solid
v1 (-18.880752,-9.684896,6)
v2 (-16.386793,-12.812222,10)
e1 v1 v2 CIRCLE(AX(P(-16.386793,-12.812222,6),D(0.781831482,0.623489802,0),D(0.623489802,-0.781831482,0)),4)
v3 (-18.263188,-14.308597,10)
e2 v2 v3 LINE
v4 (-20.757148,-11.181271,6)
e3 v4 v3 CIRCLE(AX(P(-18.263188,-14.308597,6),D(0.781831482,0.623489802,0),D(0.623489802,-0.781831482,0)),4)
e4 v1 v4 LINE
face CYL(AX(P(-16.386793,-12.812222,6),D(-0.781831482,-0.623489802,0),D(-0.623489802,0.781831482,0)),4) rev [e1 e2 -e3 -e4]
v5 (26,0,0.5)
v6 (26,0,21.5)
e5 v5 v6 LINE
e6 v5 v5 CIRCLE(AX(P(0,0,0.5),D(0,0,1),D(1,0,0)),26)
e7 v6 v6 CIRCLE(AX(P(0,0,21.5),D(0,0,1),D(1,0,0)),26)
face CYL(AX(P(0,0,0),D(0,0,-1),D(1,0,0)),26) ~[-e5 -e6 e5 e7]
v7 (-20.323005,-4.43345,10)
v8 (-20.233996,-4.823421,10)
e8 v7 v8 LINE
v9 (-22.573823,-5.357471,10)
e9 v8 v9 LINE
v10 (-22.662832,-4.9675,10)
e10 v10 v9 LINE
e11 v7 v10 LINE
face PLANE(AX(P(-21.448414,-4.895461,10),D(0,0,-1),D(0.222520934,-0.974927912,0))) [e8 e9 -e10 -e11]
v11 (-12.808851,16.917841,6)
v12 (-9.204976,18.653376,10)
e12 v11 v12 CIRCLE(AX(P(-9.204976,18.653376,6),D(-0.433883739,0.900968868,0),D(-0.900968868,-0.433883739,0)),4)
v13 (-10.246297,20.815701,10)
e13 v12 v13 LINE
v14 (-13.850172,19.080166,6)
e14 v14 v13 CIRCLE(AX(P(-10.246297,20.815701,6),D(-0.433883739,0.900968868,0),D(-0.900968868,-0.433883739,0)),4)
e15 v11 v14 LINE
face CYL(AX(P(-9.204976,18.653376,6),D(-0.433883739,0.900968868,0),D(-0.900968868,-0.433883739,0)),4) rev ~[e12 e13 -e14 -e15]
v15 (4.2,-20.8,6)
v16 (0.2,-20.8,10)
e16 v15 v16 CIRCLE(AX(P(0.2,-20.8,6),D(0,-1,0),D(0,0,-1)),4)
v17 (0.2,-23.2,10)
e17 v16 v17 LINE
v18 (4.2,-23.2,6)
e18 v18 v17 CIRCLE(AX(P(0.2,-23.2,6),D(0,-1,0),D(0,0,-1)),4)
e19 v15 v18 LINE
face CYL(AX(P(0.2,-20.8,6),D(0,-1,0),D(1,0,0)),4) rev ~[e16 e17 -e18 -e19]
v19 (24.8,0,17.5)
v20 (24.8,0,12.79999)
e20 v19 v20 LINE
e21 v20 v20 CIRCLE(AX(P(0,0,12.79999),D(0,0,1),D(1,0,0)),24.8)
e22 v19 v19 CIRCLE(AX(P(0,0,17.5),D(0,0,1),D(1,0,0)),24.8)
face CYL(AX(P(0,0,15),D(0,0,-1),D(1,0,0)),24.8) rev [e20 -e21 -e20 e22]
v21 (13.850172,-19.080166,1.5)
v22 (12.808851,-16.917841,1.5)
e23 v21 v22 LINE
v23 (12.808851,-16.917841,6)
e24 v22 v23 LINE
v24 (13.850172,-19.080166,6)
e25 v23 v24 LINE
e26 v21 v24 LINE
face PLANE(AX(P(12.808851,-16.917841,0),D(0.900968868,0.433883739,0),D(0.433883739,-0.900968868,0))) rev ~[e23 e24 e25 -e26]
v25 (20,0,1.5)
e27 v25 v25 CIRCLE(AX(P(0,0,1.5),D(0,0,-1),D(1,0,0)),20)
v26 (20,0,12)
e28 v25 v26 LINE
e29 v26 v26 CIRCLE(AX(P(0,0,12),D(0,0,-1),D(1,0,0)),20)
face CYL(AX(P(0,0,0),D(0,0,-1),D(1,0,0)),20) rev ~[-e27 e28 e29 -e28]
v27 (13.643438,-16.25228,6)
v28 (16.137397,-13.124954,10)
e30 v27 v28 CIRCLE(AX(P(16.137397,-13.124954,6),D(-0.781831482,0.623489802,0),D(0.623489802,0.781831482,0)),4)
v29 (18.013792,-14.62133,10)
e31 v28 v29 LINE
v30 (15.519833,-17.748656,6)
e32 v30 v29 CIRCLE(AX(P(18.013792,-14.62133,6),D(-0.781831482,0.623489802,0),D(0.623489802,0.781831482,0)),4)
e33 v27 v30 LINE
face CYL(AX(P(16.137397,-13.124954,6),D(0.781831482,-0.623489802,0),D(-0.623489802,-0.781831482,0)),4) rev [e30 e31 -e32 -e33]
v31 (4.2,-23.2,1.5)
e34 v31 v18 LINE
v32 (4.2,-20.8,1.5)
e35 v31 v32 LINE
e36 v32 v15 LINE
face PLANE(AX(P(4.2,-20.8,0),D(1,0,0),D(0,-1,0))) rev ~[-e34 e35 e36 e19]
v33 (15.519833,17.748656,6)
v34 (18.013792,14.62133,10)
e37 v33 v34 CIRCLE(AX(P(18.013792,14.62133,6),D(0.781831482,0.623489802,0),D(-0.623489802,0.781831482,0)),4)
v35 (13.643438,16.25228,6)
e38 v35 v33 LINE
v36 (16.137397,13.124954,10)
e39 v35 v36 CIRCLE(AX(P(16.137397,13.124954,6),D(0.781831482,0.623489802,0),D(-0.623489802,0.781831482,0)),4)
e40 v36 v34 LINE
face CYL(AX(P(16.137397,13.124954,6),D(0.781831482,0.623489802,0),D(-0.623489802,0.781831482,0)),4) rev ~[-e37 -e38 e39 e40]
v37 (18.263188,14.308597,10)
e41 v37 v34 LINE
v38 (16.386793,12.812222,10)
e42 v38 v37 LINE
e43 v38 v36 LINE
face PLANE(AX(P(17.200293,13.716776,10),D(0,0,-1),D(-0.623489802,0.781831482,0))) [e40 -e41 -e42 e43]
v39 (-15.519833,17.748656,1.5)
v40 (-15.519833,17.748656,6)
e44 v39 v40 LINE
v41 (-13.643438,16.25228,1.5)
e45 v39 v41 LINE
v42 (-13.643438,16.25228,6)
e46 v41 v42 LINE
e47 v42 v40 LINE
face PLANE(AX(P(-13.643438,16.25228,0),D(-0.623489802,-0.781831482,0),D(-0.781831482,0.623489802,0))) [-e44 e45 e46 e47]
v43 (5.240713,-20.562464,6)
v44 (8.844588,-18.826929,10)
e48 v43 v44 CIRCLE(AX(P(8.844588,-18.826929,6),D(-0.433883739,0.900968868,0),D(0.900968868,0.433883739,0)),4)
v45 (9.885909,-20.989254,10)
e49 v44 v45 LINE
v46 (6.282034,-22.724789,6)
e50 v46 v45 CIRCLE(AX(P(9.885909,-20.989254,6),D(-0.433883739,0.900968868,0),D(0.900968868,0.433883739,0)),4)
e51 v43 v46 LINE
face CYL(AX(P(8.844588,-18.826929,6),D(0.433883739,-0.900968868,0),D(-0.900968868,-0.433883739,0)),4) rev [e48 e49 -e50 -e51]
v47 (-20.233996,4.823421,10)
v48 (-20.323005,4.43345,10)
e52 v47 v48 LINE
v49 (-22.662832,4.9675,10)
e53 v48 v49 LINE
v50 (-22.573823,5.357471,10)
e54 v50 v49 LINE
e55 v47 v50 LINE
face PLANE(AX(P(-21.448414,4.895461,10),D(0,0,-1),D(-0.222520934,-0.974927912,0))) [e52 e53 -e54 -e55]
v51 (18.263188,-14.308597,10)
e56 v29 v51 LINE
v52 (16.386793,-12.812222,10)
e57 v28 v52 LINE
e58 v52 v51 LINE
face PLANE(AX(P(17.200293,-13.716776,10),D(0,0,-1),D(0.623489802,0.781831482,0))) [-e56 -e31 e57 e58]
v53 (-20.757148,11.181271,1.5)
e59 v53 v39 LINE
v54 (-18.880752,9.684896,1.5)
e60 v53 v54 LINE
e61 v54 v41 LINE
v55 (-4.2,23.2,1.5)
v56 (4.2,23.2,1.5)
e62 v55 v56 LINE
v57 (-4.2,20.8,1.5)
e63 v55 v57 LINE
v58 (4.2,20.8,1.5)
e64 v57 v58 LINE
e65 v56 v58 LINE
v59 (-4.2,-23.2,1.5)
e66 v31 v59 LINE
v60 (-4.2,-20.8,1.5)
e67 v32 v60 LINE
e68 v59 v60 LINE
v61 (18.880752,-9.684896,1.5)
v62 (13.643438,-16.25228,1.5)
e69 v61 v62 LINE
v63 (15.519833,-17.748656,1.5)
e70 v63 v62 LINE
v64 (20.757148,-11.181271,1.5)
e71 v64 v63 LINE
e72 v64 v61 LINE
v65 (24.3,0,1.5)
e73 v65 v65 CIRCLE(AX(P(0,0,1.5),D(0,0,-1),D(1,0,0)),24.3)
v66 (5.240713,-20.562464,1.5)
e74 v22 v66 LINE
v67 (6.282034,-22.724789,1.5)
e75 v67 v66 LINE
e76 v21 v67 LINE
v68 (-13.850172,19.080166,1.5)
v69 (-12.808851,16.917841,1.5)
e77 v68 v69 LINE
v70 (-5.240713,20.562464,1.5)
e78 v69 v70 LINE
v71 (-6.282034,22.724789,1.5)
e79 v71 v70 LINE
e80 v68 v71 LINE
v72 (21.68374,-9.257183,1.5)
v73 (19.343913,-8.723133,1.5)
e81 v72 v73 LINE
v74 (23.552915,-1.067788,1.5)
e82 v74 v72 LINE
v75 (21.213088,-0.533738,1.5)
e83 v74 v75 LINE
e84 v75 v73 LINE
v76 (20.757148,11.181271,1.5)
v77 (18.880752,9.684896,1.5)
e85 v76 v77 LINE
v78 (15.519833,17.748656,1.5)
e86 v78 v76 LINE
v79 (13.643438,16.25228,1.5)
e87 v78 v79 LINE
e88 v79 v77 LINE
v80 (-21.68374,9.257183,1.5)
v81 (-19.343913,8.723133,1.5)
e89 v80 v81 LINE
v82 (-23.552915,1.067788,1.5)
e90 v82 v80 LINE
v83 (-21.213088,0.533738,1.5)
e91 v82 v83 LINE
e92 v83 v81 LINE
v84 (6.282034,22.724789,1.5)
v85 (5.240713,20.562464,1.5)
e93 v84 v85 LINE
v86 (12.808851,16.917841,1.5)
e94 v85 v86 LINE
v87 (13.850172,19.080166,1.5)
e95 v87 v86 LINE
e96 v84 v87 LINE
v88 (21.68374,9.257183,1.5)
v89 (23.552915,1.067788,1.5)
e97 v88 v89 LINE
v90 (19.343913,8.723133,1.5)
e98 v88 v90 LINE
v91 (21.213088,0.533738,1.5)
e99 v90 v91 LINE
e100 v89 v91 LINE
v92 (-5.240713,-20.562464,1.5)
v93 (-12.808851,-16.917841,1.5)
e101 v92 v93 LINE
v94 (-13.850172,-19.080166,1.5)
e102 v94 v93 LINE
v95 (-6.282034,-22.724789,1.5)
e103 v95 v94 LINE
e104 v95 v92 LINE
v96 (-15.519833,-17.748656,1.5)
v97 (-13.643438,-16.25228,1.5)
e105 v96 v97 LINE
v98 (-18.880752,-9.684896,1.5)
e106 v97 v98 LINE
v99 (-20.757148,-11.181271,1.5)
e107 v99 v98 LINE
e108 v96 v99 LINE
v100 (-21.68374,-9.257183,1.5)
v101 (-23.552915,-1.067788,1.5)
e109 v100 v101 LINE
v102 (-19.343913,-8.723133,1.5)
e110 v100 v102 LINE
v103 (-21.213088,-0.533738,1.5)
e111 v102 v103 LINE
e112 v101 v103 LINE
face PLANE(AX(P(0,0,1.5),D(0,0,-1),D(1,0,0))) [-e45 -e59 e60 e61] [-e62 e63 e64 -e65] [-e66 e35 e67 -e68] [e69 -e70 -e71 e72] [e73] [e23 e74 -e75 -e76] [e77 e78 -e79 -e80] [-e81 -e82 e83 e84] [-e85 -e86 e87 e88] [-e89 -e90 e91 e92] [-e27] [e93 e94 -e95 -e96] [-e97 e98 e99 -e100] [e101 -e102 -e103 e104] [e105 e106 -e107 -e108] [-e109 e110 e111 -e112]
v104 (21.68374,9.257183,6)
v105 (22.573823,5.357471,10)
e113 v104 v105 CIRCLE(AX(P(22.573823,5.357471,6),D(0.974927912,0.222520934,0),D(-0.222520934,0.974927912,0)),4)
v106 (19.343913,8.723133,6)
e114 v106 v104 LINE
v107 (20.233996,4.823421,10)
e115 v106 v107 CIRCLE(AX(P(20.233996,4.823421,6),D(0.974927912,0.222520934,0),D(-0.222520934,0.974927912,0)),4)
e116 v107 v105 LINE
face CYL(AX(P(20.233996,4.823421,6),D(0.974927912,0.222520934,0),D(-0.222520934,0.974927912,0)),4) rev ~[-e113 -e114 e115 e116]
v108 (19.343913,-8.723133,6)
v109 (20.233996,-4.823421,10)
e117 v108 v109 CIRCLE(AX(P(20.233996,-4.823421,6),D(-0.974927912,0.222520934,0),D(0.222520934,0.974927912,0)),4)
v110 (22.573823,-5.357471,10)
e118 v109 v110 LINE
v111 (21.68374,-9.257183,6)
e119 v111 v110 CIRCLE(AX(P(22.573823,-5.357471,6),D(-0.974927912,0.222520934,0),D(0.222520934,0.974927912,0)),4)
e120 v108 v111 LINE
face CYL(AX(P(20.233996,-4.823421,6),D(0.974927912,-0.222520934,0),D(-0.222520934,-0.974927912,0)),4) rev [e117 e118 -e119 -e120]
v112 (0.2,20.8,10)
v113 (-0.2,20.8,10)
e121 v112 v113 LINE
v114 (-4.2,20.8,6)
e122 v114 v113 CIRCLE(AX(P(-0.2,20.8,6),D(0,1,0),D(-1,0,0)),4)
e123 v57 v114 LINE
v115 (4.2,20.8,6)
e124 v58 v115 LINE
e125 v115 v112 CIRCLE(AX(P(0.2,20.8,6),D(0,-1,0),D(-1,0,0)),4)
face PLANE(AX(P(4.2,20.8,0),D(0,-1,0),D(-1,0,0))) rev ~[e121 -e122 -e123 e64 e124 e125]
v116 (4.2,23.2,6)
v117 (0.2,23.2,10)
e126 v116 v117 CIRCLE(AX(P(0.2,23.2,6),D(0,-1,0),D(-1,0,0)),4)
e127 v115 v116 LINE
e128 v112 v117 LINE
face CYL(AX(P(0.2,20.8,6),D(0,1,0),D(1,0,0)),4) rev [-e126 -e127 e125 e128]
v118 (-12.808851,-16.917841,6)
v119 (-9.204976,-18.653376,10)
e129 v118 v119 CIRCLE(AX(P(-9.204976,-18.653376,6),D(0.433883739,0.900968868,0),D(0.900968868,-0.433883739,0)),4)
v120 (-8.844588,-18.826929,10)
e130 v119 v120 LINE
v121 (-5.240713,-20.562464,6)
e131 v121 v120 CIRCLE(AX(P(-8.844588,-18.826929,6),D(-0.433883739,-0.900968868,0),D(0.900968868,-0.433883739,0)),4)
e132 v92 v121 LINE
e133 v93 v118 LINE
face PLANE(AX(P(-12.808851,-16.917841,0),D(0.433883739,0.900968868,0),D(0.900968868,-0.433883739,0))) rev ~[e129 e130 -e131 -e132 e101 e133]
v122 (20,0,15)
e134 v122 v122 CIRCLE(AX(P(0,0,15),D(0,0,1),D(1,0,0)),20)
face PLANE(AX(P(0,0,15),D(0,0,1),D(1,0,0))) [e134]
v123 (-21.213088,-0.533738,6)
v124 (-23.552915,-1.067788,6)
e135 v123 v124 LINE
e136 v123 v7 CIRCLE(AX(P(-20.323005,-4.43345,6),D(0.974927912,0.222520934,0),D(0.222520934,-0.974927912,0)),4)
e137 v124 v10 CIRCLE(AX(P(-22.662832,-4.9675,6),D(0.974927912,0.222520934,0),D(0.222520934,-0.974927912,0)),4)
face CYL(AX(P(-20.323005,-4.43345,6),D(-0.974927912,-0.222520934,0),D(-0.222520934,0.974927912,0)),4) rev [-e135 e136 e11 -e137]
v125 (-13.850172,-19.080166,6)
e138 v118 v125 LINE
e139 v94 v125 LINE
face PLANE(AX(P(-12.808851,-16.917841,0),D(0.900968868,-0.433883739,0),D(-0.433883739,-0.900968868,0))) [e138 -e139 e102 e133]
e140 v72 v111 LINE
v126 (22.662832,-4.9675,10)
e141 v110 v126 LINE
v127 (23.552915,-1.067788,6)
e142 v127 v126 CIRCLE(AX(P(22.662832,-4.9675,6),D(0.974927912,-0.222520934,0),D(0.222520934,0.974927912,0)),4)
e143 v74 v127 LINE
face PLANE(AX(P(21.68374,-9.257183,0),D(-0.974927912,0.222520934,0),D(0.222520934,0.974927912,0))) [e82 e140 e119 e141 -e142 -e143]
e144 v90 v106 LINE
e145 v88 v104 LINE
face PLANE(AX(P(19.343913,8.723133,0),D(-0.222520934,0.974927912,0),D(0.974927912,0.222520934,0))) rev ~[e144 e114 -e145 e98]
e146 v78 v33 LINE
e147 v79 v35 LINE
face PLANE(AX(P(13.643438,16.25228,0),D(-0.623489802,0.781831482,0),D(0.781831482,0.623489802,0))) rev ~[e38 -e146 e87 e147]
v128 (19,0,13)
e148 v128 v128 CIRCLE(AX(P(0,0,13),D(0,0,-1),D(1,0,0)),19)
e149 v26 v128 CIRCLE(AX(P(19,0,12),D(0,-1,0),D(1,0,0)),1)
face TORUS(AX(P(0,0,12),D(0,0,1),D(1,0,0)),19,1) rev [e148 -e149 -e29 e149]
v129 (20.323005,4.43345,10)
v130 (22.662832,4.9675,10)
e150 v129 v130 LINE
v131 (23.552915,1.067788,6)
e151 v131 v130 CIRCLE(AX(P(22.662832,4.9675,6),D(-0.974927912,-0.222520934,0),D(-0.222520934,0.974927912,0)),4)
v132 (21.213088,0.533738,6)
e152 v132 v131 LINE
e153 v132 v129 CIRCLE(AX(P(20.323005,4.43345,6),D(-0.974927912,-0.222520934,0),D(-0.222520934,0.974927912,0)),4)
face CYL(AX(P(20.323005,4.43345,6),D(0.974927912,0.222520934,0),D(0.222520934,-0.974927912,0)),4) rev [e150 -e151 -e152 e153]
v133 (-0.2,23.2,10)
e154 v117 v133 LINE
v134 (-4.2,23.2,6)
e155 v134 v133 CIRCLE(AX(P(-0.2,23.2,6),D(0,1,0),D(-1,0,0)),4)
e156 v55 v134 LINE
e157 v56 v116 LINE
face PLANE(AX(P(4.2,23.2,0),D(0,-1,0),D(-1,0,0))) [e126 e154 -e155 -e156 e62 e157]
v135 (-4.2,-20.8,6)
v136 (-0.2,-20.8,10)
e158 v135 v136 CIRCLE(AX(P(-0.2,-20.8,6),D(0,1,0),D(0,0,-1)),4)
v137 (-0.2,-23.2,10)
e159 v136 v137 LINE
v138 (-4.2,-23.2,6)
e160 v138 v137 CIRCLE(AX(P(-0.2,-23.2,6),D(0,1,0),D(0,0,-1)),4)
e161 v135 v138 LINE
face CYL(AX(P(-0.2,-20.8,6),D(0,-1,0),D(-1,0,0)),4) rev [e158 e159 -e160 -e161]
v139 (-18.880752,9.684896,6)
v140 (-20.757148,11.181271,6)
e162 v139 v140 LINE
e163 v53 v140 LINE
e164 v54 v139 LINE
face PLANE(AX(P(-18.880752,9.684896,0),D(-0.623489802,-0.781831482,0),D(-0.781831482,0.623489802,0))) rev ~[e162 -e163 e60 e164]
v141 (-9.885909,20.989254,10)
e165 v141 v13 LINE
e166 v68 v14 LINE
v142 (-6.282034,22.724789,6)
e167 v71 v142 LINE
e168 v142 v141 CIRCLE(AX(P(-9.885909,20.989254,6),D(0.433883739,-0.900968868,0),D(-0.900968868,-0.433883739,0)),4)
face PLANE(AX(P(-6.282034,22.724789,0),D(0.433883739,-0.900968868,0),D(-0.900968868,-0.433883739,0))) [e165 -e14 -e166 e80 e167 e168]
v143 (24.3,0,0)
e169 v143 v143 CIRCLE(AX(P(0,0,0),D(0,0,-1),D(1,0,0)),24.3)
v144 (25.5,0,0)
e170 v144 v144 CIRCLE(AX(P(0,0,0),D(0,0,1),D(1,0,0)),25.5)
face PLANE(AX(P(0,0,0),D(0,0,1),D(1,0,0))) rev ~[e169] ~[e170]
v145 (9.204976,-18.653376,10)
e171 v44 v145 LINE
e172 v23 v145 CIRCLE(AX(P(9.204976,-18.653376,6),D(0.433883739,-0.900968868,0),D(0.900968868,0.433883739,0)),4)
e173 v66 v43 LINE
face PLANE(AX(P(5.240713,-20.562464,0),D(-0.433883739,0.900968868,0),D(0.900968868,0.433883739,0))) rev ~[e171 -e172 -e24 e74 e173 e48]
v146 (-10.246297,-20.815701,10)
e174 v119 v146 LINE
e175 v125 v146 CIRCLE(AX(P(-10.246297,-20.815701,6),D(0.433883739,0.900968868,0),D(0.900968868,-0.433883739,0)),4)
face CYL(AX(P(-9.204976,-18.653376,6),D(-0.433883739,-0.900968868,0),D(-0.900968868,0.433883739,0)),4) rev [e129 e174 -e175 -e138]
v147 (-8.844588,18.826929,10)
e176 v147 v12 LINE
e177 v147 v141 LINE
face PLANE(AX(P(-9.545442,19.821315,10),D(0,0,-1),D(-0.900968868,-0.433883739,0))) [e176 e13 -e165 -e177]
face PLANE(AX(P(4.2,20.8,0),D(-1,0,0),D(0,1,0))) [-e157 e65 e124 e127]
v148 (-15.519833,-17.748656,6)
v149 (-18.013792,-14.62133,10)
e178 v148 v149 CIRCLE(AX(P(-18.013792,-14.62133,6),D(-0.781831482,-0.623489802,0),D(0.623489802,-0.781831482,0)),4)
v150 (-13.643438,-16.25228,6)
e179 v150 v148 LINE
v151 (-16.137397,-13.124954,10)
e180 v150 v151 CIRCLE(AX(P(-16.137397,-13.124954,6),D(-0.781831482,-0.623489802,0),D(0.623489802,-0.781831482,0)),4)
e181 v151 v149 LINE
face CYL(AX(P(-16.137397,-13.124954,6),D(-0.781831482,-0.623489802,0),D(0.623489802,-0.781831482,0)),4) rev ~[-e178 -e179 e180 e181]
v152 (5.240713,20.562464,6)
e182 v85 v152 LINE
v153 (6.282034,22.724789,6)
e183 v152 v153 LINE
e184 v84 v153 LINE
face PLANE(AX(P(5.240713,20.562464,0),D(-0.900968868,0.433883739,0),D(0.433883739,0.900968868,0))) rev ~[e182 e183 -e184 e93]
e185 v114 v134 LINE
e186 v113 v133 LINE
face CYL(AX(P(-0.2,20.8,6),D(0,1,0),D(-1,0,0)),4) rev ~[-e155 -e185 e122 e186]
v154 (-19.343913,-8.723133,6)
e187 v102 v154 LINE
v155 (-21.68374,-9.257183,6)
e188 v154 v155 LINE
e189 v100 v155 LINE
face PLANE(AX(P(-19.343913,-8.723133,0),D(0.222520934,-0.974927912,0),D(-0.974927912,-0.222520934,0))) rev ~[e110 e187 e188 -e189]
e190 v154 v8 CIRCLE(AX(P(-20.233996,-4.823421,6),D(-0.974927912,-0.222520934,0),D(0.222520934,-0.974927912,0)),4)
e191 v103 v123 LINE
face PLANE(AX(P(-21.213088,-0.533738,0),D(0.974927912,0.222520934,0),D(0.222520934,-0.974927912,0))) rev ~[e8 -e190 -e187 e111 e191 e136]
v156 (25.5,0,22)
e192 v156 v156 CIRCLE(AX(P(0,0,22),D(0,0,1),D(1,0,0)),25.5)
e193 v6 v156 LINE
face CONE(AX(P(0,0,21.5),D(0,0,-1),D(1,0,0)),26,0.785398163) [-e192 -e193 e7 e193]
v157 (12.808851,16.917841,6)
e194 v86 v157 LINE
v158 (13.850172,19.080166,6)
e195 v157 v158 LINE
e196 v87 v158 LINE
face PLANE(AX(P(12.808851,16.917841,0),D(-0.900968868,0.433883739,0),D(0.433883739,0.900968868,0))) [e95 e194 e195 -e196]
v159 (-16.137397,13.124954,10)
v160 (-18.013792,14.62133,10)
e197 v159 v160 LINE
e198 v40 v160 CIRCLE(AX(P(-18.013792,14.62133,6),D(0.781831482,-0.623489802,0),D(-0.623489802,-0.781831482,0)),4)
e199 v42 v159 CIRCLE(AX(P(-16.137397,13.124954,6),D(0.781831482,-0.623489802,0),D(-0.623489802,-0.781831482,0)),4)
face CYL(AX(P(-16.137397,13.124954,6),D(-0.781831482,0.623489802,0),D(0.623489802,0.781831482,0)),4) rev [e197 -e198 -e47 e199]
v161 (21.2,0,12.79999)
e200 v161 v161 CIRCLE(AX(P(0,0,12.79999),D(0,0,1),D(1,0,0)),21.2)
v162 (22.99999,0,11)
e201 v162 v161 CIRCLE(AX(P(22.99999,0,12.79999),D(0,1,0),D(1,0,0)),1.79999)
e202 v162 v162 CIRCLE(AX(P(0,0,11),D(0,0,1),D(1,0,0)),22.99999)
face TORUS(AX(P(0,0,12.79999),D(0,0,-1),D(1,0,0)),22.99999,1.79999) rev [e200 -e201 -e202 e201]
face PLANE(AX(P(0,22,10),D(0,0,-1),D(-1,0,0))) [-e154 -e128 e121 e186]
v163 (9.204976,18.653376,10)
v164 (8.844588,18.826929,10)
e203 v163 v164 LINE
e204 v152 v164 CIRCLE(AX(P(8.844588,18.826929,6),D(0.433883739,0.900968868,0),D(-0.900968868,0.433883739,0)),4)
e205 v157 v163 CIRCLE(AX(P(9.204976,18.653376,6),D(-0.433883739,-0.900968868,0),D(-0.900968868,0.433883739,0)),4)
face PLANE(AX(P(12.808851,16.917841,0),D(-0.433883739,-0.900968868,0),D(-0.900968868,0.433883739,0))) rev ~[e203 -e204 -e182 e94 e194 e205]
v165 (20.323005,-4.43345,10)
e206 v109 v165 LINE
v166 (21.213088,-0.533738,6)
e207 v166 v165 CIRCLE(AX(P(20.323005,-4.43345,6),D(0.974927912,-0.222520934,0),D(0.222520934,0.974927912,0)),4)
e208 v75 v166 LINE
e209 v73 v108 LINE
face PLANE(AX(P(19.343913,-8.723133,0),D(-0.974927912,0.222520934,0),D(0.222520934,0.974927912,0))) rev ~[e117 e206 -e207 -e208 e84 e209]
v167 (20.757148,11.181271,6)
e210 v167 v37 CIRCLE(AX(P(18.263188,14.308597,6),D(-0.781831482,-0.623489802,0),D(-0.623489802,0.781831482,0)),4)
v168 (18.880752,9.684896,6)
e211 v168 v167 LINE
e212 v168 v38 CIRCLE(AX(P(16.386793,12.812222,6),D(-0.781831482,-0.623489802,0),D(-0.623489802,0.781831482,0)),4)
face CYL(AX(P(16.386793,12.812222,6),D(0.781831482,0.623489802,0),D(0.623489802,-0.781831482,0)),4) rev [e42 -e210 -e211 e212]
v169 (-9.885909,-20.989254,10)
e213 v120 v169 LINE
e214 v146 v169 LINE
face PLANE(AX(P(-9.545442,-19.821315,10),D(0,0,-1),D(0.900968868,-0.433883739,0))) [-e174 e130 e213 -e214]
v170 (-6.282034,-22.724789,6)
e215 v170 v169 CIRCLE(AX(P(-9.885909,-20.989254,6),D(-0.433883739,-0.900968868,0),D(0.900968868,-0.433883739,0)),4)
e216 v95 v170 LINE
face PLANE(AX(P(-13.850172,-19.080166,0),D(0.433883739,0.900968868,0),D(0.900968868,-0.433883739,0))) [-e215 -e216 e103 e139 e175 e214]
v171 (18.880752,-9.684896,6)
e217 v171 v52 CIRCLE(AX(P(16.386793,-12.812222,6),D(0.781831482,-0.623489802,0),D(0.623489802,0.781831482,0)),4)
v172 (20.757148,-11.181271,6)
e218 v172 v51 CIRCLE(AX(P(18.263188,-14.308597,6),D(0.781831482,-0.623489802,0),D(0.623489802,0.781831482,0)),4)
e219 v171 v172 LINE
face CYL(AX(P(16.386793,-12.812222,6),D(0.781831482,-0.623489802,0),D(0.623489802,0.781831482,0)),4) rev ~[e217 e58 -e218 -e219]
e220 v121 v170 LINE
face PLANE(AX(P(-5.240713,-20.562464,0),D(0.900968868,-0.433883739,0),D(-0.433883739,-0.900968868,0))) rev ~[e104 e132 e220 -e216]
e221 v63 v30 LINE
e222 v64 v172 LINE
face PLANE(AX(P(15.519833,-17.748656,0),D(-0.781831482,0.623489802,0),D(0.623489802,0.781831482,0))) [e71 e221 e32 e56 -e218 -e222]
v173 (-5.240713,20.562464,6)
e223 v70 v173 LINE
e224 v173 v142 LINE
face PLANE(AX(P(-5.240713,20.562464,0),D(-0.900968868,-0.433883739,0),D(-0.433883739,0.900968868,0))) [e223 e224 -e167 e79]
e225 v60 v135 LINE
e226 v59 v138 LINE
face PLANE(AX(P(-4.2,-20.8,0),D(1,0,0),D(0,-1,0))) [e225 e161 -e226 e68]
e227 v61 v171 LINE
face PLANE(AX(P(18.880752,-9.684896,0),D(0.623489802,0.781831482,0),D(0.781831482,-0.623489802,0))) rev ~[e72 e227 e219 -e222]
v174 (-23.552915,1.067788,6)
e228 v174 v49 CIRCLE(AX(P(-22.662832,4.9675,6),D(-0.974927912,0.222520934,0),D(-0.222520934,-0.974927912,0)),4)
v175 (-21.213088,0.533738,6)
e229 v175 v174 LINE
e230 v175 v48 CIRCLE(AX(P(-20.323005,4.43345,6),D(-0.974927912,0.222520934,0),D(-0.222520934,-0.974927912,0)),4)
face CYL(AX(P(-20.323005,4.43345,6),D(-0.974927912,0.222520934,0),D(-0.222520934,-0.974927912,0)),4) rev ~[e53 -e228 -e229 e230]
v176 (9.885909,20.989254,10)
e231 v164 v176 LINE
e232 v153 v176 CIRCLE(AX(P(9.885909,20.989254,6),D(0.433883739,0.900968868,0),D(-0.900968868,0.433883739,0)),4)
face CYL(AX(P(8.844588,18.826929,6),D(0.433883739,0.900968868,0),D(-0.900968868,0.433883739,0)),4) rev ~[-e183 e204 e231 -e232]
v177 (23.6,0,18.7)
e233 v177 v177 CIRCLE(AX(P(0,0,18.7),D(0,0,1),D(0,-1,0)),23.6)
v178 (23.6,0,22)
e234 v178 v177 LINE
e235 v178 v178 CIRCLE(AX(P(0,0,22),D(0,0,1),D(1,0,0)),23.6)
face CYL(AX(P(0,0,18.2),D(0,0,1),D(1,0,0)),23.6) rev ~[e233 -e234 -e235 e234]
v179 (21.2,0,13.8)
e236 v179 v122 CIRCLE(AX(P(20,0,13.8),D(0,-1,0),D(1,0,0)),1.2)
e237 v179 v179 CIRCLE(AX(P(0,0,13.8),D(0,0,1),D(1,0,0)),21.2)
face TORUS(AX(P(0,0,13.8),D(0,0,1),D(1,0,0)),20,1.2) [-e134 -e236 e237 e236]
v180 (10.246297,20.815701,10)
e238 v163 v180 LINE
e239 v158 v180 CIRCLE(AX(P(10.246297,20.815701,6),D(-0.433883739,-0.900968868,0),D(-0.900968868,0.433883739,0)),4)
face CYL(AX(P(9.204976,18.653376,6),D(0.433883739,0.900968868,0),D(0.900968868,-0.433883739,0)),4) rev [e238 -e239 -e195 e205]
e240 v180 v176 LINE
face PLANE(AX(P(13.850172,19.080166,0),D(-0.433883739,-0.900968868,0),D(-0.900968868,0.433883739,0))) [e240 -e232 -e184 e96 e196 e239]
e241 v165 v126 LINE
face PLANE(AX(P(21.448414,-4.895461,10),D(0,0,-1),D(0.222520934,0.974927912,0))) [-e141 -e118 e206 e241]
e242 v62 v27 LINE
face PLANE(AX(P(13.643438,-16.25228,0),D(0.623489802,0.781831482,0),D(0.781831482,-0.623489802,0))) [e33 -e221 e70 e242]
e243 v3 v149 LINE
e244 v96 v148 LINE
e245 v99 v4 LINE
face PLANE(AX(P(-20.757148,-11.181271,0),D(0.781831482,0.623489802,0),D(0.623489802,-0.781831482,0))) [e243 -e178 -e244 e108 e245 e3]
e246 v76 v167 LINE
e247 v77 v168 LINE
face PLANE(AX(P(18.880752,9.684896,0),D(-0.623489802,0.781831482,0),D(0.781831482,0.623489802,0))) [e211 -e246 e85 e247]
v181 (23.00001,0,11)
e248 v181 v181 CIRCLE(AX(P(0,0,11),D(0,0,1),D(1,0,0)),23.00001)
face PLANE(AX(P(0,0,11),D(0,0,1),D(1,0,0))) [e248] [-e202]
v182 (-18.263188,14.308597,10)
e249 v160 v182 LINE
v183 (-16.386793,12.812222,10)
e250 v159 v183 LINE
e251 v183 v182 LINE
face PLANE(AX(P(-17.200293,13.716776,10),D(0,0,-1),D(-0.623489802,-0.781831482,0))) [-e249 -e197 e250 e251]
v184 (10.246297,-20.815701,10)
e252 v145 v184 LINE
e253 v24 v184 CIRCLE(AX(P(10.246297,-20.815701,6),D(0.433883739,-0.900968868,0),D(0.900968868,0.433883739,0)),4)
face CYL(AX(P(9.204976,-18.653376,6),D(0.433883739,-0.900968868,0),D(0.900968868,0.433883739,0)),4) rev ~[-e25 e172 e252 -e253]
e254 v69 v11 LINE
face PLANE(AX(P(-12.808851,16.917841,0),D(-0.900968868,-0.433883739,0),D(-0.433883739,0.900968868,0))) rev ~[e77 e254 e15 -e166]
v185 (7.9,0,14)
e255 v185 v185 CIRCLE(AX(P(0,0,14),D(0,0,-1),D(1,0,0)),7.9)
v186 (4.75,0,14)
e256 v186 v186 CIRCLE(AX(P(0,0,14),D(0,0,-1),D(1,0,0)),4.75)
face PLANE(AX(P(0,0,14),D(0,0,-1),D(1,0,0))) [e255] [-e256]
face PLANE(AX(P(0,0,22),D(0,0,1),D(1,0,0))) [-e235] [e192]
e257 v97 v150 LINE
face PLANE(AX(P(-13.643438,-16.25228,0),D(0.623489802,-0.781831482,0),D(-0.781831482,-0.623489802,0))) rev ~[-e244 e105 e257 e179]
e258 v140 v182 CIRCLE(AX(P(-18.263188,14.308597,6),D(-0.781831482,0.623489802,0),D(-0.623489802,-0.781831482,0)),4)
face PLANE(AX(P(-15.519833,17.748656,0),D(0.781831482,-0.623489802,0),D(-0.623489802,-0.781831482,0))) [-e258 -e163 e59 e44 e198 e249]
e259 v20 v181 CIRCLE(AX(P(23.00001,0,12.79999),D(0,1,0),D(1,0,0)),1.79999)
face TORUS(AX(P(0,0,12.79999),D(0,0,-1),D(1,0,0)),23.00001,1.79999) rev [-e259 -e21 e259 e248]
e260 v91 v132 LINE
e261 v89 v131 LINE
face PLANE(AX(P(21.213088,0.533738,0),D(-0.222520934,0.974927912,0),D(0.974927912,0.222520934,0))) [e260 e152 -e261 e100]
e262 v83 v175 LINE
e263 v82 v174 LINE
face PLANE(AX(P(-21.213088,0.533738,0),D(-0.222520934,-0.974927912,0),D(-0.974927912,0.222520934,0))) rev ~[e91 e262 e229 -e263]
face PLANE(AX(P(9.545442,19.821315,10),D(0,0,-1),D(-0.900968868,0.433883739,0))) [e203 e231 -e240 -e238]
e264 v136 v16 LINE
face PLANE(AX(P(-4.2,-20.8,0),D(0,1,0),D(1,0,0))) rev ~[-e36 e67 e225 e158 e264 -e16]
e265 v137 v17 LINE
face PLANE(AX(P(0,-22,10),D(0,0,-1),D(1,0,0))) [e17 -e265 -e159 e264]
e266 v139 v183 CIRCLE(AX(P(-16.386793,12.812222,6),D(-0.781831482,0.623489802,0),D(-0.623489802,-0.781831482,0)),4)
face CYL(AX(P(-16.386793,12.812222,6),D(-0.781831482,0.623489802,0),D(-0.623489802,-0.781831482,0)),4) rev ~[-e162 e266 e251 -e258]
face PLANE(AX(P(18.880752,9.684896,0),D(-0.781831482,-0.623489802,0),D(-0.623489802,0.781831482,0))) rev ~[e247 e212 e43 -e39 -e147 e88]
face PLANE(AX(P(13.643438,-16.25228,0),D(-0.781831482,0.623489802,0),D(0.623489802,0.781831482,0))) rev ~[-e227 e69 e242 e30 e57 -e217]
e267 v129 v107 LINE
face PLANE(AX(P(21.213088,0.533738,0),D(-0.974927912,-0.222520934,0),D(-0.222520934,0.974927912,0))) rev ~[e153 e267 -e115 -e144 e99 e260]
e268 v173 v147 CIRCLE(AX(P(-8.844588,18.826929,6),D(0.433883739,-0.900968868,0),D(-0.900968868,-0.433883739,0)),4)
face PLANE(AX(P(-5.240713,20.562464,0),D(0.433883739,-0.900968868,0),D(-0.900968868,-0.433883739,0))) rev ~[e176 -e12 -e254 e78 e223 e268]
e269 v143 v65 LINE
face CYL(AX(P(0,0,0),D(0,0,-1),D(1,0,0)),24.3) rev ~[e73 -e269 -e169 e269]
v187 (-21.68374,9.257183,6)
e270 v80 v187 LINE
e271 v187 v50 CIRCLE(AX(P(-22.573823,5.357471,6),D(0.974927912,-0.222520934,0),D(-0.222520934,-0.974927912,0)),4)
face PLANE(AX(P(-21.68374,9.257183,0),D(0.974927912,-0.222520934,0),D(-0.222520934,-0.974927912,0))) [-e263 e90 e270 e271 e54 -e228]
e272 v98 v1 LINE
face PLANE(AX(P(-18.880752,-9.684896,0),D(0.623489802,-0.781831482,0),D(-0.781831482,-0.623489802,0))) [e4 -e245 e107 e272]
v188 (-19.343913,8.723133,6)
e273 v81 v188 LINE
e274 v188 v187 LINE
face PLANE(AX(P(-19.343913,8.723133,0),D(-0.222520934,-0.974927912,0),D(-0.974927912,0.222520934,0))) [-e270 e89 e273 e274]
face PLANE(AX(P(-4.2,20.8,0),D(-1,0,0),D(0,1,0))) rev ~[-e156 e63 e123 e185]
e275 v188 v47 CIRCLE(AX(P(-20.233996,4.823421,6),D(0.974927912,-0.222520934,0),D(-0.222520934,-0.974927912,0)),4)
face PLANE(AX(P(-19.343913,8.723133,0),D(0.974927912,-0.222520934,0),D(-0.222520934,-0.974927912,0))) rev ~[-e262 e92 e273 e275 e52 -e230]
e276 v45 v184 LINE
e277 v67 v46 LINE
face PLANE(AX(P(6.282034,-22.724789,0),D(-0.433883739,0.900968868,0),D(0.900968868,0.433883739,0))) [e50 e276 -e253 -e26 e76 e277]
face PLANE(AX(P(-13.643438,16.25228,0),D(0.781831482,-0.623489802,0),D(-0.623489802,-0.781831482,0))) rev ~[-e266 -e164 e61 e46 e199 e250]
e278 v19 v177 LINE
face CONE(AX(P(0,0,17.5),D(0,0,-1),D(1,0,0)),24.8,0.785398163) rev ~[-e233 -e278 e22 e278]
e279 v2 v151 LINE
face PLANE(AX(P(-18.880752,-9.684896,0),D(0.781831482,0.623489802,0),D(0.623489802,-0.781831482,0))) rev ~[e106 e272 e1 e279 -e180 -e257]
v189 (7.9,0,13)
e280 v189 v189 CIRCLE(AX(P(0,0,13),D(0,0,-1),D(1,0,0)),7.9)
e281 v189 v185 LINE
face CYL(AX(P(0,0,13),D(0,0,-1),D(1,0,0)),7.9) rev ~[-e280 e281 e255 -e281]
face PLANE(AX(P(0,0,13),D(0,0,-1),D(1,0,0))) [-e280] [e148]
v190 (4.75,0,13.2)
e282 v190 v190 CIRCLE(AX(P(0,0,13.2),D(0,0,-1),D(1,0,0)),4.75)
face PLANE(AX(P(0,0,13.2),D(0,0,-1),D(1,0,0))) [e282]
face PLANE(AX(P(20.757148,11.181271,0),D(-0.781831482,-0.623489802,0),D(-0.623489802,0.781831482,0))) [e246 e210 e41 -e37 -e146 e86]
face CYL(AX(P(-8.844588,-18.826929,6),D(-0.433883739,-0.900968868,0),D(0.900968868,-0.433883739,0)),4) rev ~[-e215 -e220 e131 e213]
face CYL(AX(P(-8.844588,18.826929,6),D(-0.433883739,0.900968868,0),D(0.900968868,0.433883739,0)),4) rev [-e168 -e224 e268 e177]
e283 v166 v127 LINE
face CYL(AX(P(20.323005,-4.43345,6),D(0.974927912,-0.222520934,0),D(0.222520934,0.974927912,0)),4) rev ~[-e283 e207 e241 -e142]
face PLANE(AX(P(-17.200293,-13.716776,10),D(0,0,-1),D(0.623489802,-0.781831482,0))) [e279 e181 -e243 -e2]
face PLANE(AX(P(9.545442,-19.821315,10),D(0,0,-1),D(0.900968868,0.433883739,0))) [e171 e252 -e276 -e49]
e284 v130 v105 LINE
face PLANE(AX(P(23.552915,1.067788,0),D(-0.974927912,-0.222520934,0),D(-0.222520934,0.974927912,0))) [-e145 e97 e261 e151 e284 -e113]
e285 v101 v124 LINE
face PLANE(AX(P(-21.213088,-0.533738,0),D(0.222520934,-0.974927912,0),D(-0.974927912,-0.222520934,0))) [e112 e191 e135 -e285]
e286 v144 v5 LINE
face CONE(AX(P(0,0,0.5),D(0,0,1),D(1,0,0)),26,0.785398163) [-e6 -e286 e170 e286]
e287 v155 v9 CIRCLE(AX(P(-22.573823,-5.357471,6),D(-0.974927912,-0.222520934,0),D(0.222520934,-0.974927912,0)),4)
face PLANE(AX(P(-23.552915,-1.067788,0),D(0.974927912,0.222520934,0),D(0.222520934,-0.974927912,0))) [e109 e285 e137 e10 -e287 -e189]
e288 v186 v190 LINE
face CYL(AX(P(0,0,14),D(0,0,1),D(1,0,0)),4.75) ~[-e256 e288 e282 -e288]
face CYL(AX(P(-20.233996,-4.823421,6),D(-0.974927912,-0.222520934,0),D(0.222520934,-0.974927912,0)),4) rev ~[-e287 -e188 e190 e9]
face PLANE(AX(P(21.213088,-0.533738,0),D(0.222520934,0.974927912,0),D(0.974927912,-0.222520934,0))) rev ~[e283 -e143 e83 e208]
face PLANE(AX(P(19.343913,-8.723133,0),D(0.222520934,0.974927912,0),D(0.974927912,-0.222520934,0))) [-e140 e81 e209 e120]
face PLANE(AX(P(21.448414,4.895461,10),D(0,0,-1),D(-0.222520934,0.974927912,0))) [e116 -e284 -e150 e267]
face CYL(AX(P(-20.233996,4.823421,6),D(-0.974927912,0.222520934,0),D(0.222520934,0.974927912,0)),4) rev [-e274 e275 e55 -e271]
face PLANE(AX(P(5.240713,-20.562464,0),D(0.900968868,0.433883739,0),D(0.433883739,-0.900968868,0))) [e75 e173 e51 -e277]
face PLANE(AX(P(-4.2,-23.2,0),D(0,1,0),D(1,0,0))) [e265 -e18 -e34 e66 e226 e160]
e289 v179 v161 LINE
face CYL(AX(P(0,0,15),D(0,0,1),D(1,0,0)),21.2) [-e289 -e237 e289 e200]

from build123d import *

# Parameters (mm, degrees)
F0_R            = 26
F1_DEPTH        = 22
F2_W            = 8.4
F2_H            = 2.4
F3_DEPTH        = 10
F3_COPIES_COUNT = 14
F4_R            = 4
F5_R            = 20
F6_DEPTH        = 13
F7_R            = 7.9
F8_DEPTH        = 1
F9_R            = 4.75
F10_DEPTH       = 0.8
F11_R           = 23.6
F12_DEPTH       = 7
F13_R           = 24.8
F13_R_2         = 21.2
F14_DEPTH       = 4
F14_DEPTH_BACK  = 4
F15_R           = 1.79999
F16_R           = 1.2
F17_S5_R        = 23.6
F17_T6_DEPTH    = 37
F18_R           = 1
F19_SIZE        = 0.5
F20_R           = 24.3
F21_DEPTH       = 1.5


# Not quite as in the source:
# - a fillet or chamfer that OpenCascade refuses, or shapes differently, is made with other operations: its cross-section is extruded or revolved along the edge and cut away or added
# - a fillet or chamfer is up to 0.001 mm smaller than in the source, because OpenCascade refuses the exact size
# - a pattern or mirror of a feature is missing from the dataset's text; its kind, count and spacing are read off the source's solid


with BuildPart() as f1:
    # F0 (on Top) → F1 (new body)
    with BuildSketch(Plane.XY):
        Circle(F0_R)
    extrude(amount=F1_DEPTH)

    # F2 (on face) → F3 (cut)
    with BuildSketch(Plane(origin=(0, 0, 0), x_dir=(1, 0, 0), z_dir=(0, 0, -1))):
        with Locations((0, 22)):
            Rectangle(F2_W, F2_H)
    f3 = extrude(amount=-F3_DEPTH, mode=Mode.SUBTRACT)

    # F3_copies: F3 ×14 about axis
    f3_copies_axis = Axis((0, 0, 0), (0, 0, 1))
    for i in range(1, F3_COPIES_COUNT):
        add(f3.rotate(f3_copies_axis, i * 360 / F3_COPIES_COUNT), mode=Mode.SUBTRACT)

    # F4
    f4_edges = [f1.edges().sort_by_distance(p)[0] for p in [
        (4.2, -22, 10),
        (-4.2, -22, 10),
        (-19.81895, -10.433083, 10),
        (-14.581635, -17.000468, 10),
        (-13.329512, -17.999003, 10),
        (-5.761373, -21.643627, 10),
        (-22.383002, -0.800763, 10),
        (-20.513826, -8.990158, 10),
        (5.761373, -21.643627, 10),
        (13.329512, -17.999003, 10),
        (14.581635, -17.000468, 10),
        (19.81895, -10.433083, 10),
        (20.513826, -8.990158, 10),
        (22.383002, -0.800763, 10),
        (-20.513826, 8.990158, 10),
        (-22.383002, 0.800763, 10),
        (-14.581635, 17.000468, 10),
        (-19.81895, 10.433083, 10),
        (-5.761373, 21.643627, 10),
        (-13.329512, 17.999003, 10),
        (22.383002, 0.800763, 10),
        (20.513826, 8.990158, 10),
        (4.2, 22, 10),
        (-4.2, 22, 10),
        (13.329512, 17.999003, 10),
        (5.761373, 21.643627, 10),
        (19.81895, 10.433083, 10),
        (14.581635, 17.000468, 10),
    ]]
    fillet(f4_edges, radius=F4_R)

    # F5 (on face) → F6 (cut)
    with BuildSketch(Plane(origin=(0, 0, 0), x_dir=(1, 0, 0), z_dir=(0, 0, -1))):
        Circle(F5_R)
    extrude(amount=-F6_DEPTH, mode=Mode.SUBTRACT)

    # F7 (on face) → F8 (cut)
    with BuildSketch(Plane(origin=(0, 0, 13), x_dir=(1, 0, 0), z_dir=(0, 0, -1))):
        Circle(F7_R)
    extrude(amount=-F8_DEPTH, mode=Mode.SUBTRACT)

    # F9 (on face) → F10 (join)
    with BuildSketch(Plane(origin=(0, 0, 14), x_dir=(1, 0, 0), z_dir=(0, 0, -1))):
        Circle(F9_R)
    extrude(amount=F10_DEPTH)

    # F11 (on face) → F12 (cut)
    with BuildSketch(Plane.XY.offset(22)):
        Circle(F11_R)
    extrude(amount=-F12_DEPTH, mode=Mode.SUBTRACT)

    # F13 (on face) → F14 (cut, two sides)
    with BuildSketch(Plane.XY.offset(15)) as f14_sk:
        Circle(F13_R)
        Circle(F13_R_2, mode=Mode.SUBTRACT)
    extrude(amount=-F14_DEPTH, mode=Mode.SUBTRACT)
    extrude(f14_sk.sketch, amount=F14_DEPTH_BACK, mode=Mode.SUBTRACT)

    # F15 (radius 1.8 in the source; OpenCascade refuses exactly that, so slightly less here)
    f15_edges = [f1.edges().sort_by_distance(p)[0] for p in [
        (-24.8, 0, 11),
        (-21.2, 0, 11),
    ]]
    fillet(f15_edges, radius=F15_R)

    # F16
    f16_edges = [f1.edges().sort_by_distance(p)[0] for p in [
        (-21.2, 0, 15),
    ]]
    fillet(f16_edges, radius=F16_R)

    # F17: chamfer of 1.5 on 1 edges, made by hand


with BuildPart() as f17_tool2:
    # F17_s3 → F17_t4 (revolve)
    with BuildSketch(Plane.XZ):
        Polygon((24.8, 17.5), (23.3, 19), (24.8, 19), align=None)
    revolve(axis=Axis((0, 0, 19), (0, 0, 1)))

    # F17_s5 → F17_t6 (cut, symmetric)
    with BuildSketch(Plane.XY.offset(18.2)):
        Circle(F17_S5_R)
    extrude(amount=F17_T6_DEPTH, both=True, mode=Mode.SUBTRACT)


with BuildPart() as f1_1:
    add(f1.part)

    # F17_t1: union F17_tool2
    add(f17_tool2.part)

    # F18
    f18_edges = [f1_1.edges().sort_by_distance(p)[0] for p in [
        (-20, 0, 13),
    ]]
    fillet(f18_edges, radius=F18_R)

    # F19
    f19_edges = [f1_1.edges().sort_by_distance(p)[0] for p in [
        (-26, 0, 0),
        (-26, 0, 22),
    ]]
    chamfer(f19_edges, length=F19_SIZE)

    # F20 (on face) → F21 (cut)
    with BuildSketch(Plane(origin=(0, 0, 0), x_dir=(1, 0, 0), z_dir=(0, 0, -1))):
        Circle(F20_R)
    extrude(amount=-F21_DEPTH, mode=Mode.SUBTRACT)


solid = f1_1.part
